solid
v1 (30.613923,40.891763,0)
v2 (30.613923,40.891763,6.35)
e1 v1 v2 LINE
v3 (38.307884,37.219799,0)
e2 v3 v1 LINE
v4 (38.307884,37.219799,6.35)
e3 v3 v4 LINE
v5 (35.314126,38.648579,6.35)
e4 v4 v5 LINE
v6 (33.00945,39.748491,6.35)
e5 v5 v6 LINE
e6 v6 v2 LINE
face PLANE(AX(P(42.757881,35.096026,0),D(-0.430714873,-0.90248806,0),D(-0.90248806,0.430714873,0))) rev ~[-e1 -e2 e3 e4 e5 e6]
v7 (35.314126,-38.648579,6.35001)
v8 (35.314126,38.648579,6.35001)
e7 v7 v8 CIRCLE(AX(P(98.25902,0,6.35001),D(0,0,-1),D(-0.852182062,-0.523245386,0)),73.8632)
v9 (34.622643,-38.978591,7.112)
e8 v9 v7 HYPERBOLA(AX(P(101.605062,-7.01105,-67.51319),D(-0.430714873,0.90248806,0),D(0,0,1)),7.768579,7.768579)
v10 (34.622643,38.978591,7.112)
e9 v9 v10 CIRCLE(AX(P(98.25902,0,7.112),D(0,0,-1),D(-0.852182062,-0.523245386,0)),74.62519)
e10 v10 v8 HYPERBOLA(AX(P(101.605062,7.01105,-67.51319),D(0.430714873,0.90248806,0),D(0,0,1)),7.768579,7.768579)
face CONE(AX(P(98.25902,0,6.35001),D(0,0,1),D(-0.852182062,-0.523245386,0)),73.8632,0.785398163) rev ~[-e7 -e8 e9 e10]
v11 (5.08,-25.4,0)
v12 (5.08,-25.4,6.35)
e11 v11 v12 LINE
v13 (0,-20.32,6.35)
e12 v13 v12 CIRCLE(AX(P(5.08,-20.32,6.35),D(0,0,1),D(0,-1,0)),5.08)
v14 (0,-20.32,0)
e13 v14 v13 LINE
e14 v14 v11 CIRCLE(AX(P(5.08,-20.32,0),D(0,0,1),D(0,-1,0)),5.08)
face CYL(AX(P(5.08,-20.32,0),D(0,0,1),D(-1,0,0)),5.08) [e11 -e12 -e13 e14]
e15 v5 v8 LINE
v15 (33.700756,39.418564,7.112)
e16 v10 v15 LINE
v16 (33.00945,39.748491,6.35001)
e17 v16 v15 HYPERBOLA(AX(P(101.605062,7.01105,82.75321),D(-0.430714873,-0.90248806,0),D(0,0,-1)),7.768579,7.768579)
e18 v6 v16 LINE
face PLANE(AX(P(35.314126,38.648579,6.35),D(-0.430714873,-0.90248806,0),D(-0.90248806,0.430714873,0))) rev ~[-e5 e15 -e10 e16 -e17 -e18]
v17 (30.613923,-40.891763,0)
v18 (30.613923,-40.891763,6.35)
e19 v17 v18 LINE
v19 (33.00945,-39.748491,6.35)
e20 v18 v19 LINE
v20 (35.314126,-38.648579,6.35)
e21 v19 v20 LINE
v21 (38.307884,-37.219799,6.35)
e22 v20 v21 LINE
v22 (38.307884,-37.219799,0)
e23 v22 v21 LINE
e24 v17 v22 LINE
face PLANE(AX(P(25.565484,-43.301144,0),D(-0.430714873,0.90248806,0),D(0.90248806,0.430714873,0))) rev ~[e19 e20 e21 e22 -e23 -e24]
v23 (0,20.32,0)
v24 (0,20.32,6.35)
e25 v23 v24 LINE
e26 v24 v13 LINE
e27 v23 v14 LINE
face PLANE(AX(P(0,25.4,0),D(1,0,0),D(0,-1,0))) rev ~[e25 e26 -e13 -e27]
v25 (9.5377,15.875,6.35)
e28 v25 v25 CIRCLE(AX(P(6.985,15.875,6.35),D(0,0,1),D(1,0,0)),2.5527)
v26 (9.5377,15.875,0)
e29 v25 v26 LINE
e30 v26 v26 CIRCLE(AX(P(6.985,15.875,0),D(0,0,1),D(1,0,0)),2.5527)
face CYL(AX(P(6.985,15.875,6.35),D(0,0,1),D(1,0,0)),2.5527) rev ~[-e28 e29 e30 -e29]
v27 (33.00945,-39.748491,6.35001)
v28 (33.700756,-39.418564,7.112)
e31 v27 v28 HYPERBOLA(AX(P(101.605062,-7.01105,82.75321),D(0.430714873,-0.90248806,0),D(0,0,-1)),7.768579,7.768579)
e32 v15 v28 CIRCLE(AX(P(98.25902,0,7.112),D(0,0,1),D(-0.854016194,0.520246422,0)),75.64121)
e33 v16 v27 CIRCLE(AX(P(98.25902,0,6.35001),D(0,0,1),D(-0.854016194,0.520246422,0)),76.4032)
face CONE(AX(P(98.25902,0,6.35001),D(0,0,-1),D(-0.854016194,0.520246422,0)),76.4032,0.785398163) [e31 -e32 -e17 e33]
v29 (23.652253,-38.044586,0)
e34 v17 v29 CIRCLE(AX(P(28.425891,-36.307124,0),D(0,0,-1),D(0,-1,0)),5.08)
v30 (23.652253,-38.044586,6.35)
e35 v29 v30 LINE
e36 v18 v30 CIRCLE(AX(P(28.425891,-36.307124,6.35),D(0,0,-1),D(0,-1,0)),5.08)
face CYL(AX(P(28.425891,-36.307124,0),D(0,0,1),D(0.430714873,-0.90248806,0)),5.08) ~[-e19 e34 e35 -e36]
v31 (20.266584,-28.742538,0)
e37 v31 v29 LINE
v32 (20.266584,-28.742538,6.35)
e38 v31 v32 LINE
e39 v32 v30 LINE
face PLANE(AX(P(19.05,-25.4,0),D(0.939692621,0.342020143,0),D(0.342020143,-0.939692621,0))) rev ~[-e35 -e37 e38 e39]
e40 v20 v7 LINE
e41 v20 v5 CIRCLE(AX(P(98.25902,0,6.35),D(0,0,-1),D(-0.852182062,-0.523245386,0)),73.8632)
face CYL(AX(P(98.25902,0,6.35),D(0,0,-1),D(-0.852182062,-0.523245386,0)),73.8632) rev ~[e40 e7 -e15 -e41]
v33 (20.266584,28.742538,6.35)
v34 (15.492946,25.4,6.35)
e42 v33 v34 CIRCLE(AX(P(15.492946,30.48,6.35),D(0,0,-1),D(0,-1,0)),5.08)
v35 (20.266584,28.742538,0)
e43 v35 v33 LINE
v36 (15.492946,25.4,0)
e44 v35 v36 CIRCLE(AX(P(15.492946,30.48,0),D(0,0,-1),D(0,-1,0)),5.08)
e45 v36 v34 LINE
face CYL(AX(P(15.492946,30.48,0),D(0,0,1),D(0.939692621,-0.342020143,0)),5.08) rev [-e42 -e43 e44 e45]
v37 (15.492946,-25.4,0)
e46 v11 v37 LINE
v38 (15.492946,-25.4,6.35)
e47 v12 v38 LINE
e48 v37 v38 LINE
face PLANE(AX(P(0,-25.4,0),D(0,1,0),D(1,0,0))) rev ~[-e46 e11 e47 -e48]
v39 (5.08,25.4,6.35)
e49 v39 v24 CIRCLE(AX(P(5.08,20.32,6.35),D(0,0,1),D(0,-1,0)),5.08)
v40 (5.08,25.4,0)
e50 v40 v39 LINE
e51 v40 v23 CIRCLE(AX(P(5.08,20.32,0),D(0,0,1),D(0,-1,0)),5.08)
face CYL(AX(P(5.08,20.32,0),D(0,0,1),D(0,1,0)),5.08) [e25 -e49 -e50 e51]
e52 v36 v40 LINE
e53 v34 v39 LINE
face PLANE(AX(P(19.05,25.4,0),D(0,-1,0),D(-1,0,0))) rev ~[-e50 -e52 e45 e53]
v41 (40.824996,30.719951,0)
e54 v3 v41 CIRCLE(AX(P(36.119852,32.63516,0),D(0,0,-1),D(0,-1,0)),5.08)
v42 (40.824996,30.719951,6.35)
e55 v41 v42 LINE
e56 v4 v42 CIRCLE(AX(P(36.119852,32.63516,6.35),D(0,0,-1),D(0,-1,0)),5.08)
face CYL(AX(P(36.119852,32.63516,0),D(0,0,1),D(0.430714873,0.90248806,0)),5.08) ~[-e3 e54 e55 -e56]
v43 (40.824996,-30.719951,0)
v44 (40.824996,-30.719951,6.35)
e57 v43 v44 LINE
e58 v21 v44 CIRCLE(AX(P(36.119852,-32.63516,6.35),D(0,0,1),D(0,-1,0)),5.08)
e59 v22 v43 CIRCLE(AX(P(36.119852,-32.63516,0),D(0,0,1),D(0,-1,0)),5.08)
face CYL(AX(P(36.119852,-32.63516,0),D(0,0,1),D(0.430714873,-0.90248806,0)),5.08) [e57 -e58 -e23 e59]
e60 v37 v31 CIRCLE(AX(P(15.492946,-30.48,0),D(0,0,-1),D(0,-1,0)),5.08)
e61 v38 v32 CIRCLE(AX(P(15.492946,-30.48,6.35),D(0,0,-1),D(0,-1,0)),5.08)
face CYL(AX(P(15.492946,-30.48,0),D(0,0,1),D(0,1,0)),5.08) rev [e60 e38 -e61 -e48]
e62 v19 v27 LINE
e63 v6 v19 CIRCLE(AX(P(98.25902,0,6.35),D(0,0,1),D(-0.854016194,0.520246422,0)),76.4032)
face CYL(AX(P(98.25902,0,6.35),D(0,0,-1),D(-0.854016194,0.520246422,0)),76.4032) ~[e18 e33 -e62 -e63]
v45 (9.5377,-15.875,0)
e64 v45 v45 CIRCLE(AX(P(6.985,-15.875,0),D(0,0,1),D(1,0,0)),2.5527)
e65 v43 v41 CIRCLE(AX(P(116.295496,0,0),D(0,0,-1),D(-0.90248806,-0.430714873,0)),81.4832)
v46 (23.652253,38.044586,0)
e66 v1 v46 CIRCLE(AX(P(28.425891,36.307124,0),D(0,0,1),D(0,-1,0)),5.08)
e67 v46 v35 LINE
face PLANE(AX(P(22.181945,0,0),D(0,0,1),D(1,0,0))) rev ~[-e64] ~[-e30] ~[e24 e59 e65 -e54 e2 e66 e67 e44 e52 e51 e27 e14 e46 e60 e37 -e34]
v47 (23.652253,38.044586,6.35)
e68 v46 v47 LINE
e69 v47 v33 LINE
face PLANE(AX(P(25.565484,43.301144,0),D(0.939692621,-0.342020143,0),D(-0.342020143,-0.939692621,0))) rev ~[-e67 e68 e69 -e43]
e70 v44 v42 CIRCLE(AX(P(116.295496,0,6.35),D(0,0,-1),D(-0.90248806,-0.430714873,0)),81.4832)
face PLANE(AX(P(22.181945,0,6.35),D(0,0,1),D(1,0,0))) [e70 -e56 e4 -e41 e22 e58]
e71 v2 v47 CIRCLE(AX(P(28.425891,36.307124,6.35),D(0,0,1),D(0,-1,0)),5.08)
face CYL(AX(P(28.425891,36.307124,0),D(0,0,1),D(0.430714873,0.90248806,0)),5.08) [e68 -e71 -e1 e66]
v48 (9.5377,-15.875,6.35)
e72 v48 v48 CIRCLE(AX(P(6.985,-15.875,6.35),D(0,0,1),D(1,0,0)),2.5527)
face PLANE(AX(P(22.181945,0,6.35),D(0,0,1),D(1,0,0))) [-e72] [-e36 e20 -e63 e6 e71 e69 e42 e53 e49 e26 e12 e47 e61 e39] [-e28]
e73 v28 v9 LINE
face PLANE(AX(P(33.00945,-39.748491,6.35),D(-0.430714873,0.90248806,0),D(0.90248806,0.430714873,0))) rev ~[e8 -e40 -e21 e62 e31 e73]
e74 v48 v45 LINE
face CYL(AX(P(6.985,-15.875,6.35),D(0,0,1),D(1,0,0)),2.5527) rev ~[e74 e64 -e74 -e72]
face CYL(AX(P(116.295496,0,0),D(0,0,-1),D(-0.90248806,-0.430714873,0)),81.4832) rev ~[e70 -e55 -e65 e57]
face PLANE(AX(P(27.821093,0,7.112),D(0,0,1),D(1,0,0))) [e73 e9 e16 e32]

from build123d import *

# Parameters (mm, degrees)
F1_DEPTH = 6.35
F3_DEPTH = 0.762
F4_SIZE  = 0.76199
F5_R     = 2.5527
F6_DEPTH = 6.351
F7_R     = 5.08


# Not quite as in the source:
# - a fillet or chamfer is up to 0.001 mm smaller than in the source, because OpenCascade refuses the exact size


with BuildPart() as f1:
    # F0 (on Top) → F1 (new body)
    with BuildSketch(Plane.XY):
        with BuildLine():
            Line((19.05, 25.4), (0, 25.4))
            Line((0, 25.4), (0, -25.4))
            Line((0, -25.4), (19.05, -25.4))
            Line((19.05, -25.4), (25.5654837304, -43.301144426))
            Line((25.5654837304, -43.301144426), (42.7578812746, -35.0960261037))
            ThreePointArc((42.7578812746, -35.0960261037), (34.8122963703, 0), (42.7578812746, 35.0960261037))
            Line((42.7578812746, 35.0960261037), (25.5654837304, 43.301144426))
            Line((25.5654837304, 43.301144426), (19.05, 25.4))
        make_face()
    extrude(amount=F1_DEPTH)

    # F2 (on face) → F3 (join)
    with BuildSketch(Plane.XY.offset(6.35)):
        with BuildLine():
            Line((35.3141257953, 38.64857858), (33.0094497647, 39.7484914617))
            ThreePointArc((33.0094497647, 39.7484914617), (21.8558198534, 0), (33.0094497647, -39.7484914617))
            Line((33.0094497647, -39.7484914617), (35.3141257953, -38.64857858))
            ThreePointArc((35.3141257953, -38.64857858), (24.3958198534, 0), (35.3141257953, 38.64857858))
        make_face()
    extrude(amount=F3_DEPTH)

    # F4 (size 0.762 in the source; OpenCascade refuses exactly that, so slightly less here)
    f4_edges = [f1.edges().sort_by_distance(p)[0] for p in [
        (21.85582, 0, 7.112),
        (24.39582, 0, 7.112),
    ]]
    chamfer(f4_edges, length=F4_SIZE)

    # F5 (on face) → F6 (cut, through all)
    with BuildSketch(Plane.XY.offset(6.35)):
        with Locations((6.985, 15.875)):
            Circle(F5_R)
        with Locations((6.985, -15.875)):
            Circle(F5_R)
    extrude(amount=-F6_DEPTH, mode=Mode.SUBTRACT)

    # F7
    f7_edges = [f1.edges().sort_by_distance(p)[0] for p in [
        (0, -25.4, 3.175),
        (19.05, -25.4, 3.175),
        (25.565484, -43.301144, 3.175),
        (42.757881, -35.096026, 3.175),
        (0, 25.4, 3.175),
        (19.05, 25.4, 3.175),
        (25.565484, 43.301144, 3.175),
        (42.757881, 35.096026, 3.175),
    ]]
    fillet(f7_edges, radius=F7_R)


solid = f1.part
